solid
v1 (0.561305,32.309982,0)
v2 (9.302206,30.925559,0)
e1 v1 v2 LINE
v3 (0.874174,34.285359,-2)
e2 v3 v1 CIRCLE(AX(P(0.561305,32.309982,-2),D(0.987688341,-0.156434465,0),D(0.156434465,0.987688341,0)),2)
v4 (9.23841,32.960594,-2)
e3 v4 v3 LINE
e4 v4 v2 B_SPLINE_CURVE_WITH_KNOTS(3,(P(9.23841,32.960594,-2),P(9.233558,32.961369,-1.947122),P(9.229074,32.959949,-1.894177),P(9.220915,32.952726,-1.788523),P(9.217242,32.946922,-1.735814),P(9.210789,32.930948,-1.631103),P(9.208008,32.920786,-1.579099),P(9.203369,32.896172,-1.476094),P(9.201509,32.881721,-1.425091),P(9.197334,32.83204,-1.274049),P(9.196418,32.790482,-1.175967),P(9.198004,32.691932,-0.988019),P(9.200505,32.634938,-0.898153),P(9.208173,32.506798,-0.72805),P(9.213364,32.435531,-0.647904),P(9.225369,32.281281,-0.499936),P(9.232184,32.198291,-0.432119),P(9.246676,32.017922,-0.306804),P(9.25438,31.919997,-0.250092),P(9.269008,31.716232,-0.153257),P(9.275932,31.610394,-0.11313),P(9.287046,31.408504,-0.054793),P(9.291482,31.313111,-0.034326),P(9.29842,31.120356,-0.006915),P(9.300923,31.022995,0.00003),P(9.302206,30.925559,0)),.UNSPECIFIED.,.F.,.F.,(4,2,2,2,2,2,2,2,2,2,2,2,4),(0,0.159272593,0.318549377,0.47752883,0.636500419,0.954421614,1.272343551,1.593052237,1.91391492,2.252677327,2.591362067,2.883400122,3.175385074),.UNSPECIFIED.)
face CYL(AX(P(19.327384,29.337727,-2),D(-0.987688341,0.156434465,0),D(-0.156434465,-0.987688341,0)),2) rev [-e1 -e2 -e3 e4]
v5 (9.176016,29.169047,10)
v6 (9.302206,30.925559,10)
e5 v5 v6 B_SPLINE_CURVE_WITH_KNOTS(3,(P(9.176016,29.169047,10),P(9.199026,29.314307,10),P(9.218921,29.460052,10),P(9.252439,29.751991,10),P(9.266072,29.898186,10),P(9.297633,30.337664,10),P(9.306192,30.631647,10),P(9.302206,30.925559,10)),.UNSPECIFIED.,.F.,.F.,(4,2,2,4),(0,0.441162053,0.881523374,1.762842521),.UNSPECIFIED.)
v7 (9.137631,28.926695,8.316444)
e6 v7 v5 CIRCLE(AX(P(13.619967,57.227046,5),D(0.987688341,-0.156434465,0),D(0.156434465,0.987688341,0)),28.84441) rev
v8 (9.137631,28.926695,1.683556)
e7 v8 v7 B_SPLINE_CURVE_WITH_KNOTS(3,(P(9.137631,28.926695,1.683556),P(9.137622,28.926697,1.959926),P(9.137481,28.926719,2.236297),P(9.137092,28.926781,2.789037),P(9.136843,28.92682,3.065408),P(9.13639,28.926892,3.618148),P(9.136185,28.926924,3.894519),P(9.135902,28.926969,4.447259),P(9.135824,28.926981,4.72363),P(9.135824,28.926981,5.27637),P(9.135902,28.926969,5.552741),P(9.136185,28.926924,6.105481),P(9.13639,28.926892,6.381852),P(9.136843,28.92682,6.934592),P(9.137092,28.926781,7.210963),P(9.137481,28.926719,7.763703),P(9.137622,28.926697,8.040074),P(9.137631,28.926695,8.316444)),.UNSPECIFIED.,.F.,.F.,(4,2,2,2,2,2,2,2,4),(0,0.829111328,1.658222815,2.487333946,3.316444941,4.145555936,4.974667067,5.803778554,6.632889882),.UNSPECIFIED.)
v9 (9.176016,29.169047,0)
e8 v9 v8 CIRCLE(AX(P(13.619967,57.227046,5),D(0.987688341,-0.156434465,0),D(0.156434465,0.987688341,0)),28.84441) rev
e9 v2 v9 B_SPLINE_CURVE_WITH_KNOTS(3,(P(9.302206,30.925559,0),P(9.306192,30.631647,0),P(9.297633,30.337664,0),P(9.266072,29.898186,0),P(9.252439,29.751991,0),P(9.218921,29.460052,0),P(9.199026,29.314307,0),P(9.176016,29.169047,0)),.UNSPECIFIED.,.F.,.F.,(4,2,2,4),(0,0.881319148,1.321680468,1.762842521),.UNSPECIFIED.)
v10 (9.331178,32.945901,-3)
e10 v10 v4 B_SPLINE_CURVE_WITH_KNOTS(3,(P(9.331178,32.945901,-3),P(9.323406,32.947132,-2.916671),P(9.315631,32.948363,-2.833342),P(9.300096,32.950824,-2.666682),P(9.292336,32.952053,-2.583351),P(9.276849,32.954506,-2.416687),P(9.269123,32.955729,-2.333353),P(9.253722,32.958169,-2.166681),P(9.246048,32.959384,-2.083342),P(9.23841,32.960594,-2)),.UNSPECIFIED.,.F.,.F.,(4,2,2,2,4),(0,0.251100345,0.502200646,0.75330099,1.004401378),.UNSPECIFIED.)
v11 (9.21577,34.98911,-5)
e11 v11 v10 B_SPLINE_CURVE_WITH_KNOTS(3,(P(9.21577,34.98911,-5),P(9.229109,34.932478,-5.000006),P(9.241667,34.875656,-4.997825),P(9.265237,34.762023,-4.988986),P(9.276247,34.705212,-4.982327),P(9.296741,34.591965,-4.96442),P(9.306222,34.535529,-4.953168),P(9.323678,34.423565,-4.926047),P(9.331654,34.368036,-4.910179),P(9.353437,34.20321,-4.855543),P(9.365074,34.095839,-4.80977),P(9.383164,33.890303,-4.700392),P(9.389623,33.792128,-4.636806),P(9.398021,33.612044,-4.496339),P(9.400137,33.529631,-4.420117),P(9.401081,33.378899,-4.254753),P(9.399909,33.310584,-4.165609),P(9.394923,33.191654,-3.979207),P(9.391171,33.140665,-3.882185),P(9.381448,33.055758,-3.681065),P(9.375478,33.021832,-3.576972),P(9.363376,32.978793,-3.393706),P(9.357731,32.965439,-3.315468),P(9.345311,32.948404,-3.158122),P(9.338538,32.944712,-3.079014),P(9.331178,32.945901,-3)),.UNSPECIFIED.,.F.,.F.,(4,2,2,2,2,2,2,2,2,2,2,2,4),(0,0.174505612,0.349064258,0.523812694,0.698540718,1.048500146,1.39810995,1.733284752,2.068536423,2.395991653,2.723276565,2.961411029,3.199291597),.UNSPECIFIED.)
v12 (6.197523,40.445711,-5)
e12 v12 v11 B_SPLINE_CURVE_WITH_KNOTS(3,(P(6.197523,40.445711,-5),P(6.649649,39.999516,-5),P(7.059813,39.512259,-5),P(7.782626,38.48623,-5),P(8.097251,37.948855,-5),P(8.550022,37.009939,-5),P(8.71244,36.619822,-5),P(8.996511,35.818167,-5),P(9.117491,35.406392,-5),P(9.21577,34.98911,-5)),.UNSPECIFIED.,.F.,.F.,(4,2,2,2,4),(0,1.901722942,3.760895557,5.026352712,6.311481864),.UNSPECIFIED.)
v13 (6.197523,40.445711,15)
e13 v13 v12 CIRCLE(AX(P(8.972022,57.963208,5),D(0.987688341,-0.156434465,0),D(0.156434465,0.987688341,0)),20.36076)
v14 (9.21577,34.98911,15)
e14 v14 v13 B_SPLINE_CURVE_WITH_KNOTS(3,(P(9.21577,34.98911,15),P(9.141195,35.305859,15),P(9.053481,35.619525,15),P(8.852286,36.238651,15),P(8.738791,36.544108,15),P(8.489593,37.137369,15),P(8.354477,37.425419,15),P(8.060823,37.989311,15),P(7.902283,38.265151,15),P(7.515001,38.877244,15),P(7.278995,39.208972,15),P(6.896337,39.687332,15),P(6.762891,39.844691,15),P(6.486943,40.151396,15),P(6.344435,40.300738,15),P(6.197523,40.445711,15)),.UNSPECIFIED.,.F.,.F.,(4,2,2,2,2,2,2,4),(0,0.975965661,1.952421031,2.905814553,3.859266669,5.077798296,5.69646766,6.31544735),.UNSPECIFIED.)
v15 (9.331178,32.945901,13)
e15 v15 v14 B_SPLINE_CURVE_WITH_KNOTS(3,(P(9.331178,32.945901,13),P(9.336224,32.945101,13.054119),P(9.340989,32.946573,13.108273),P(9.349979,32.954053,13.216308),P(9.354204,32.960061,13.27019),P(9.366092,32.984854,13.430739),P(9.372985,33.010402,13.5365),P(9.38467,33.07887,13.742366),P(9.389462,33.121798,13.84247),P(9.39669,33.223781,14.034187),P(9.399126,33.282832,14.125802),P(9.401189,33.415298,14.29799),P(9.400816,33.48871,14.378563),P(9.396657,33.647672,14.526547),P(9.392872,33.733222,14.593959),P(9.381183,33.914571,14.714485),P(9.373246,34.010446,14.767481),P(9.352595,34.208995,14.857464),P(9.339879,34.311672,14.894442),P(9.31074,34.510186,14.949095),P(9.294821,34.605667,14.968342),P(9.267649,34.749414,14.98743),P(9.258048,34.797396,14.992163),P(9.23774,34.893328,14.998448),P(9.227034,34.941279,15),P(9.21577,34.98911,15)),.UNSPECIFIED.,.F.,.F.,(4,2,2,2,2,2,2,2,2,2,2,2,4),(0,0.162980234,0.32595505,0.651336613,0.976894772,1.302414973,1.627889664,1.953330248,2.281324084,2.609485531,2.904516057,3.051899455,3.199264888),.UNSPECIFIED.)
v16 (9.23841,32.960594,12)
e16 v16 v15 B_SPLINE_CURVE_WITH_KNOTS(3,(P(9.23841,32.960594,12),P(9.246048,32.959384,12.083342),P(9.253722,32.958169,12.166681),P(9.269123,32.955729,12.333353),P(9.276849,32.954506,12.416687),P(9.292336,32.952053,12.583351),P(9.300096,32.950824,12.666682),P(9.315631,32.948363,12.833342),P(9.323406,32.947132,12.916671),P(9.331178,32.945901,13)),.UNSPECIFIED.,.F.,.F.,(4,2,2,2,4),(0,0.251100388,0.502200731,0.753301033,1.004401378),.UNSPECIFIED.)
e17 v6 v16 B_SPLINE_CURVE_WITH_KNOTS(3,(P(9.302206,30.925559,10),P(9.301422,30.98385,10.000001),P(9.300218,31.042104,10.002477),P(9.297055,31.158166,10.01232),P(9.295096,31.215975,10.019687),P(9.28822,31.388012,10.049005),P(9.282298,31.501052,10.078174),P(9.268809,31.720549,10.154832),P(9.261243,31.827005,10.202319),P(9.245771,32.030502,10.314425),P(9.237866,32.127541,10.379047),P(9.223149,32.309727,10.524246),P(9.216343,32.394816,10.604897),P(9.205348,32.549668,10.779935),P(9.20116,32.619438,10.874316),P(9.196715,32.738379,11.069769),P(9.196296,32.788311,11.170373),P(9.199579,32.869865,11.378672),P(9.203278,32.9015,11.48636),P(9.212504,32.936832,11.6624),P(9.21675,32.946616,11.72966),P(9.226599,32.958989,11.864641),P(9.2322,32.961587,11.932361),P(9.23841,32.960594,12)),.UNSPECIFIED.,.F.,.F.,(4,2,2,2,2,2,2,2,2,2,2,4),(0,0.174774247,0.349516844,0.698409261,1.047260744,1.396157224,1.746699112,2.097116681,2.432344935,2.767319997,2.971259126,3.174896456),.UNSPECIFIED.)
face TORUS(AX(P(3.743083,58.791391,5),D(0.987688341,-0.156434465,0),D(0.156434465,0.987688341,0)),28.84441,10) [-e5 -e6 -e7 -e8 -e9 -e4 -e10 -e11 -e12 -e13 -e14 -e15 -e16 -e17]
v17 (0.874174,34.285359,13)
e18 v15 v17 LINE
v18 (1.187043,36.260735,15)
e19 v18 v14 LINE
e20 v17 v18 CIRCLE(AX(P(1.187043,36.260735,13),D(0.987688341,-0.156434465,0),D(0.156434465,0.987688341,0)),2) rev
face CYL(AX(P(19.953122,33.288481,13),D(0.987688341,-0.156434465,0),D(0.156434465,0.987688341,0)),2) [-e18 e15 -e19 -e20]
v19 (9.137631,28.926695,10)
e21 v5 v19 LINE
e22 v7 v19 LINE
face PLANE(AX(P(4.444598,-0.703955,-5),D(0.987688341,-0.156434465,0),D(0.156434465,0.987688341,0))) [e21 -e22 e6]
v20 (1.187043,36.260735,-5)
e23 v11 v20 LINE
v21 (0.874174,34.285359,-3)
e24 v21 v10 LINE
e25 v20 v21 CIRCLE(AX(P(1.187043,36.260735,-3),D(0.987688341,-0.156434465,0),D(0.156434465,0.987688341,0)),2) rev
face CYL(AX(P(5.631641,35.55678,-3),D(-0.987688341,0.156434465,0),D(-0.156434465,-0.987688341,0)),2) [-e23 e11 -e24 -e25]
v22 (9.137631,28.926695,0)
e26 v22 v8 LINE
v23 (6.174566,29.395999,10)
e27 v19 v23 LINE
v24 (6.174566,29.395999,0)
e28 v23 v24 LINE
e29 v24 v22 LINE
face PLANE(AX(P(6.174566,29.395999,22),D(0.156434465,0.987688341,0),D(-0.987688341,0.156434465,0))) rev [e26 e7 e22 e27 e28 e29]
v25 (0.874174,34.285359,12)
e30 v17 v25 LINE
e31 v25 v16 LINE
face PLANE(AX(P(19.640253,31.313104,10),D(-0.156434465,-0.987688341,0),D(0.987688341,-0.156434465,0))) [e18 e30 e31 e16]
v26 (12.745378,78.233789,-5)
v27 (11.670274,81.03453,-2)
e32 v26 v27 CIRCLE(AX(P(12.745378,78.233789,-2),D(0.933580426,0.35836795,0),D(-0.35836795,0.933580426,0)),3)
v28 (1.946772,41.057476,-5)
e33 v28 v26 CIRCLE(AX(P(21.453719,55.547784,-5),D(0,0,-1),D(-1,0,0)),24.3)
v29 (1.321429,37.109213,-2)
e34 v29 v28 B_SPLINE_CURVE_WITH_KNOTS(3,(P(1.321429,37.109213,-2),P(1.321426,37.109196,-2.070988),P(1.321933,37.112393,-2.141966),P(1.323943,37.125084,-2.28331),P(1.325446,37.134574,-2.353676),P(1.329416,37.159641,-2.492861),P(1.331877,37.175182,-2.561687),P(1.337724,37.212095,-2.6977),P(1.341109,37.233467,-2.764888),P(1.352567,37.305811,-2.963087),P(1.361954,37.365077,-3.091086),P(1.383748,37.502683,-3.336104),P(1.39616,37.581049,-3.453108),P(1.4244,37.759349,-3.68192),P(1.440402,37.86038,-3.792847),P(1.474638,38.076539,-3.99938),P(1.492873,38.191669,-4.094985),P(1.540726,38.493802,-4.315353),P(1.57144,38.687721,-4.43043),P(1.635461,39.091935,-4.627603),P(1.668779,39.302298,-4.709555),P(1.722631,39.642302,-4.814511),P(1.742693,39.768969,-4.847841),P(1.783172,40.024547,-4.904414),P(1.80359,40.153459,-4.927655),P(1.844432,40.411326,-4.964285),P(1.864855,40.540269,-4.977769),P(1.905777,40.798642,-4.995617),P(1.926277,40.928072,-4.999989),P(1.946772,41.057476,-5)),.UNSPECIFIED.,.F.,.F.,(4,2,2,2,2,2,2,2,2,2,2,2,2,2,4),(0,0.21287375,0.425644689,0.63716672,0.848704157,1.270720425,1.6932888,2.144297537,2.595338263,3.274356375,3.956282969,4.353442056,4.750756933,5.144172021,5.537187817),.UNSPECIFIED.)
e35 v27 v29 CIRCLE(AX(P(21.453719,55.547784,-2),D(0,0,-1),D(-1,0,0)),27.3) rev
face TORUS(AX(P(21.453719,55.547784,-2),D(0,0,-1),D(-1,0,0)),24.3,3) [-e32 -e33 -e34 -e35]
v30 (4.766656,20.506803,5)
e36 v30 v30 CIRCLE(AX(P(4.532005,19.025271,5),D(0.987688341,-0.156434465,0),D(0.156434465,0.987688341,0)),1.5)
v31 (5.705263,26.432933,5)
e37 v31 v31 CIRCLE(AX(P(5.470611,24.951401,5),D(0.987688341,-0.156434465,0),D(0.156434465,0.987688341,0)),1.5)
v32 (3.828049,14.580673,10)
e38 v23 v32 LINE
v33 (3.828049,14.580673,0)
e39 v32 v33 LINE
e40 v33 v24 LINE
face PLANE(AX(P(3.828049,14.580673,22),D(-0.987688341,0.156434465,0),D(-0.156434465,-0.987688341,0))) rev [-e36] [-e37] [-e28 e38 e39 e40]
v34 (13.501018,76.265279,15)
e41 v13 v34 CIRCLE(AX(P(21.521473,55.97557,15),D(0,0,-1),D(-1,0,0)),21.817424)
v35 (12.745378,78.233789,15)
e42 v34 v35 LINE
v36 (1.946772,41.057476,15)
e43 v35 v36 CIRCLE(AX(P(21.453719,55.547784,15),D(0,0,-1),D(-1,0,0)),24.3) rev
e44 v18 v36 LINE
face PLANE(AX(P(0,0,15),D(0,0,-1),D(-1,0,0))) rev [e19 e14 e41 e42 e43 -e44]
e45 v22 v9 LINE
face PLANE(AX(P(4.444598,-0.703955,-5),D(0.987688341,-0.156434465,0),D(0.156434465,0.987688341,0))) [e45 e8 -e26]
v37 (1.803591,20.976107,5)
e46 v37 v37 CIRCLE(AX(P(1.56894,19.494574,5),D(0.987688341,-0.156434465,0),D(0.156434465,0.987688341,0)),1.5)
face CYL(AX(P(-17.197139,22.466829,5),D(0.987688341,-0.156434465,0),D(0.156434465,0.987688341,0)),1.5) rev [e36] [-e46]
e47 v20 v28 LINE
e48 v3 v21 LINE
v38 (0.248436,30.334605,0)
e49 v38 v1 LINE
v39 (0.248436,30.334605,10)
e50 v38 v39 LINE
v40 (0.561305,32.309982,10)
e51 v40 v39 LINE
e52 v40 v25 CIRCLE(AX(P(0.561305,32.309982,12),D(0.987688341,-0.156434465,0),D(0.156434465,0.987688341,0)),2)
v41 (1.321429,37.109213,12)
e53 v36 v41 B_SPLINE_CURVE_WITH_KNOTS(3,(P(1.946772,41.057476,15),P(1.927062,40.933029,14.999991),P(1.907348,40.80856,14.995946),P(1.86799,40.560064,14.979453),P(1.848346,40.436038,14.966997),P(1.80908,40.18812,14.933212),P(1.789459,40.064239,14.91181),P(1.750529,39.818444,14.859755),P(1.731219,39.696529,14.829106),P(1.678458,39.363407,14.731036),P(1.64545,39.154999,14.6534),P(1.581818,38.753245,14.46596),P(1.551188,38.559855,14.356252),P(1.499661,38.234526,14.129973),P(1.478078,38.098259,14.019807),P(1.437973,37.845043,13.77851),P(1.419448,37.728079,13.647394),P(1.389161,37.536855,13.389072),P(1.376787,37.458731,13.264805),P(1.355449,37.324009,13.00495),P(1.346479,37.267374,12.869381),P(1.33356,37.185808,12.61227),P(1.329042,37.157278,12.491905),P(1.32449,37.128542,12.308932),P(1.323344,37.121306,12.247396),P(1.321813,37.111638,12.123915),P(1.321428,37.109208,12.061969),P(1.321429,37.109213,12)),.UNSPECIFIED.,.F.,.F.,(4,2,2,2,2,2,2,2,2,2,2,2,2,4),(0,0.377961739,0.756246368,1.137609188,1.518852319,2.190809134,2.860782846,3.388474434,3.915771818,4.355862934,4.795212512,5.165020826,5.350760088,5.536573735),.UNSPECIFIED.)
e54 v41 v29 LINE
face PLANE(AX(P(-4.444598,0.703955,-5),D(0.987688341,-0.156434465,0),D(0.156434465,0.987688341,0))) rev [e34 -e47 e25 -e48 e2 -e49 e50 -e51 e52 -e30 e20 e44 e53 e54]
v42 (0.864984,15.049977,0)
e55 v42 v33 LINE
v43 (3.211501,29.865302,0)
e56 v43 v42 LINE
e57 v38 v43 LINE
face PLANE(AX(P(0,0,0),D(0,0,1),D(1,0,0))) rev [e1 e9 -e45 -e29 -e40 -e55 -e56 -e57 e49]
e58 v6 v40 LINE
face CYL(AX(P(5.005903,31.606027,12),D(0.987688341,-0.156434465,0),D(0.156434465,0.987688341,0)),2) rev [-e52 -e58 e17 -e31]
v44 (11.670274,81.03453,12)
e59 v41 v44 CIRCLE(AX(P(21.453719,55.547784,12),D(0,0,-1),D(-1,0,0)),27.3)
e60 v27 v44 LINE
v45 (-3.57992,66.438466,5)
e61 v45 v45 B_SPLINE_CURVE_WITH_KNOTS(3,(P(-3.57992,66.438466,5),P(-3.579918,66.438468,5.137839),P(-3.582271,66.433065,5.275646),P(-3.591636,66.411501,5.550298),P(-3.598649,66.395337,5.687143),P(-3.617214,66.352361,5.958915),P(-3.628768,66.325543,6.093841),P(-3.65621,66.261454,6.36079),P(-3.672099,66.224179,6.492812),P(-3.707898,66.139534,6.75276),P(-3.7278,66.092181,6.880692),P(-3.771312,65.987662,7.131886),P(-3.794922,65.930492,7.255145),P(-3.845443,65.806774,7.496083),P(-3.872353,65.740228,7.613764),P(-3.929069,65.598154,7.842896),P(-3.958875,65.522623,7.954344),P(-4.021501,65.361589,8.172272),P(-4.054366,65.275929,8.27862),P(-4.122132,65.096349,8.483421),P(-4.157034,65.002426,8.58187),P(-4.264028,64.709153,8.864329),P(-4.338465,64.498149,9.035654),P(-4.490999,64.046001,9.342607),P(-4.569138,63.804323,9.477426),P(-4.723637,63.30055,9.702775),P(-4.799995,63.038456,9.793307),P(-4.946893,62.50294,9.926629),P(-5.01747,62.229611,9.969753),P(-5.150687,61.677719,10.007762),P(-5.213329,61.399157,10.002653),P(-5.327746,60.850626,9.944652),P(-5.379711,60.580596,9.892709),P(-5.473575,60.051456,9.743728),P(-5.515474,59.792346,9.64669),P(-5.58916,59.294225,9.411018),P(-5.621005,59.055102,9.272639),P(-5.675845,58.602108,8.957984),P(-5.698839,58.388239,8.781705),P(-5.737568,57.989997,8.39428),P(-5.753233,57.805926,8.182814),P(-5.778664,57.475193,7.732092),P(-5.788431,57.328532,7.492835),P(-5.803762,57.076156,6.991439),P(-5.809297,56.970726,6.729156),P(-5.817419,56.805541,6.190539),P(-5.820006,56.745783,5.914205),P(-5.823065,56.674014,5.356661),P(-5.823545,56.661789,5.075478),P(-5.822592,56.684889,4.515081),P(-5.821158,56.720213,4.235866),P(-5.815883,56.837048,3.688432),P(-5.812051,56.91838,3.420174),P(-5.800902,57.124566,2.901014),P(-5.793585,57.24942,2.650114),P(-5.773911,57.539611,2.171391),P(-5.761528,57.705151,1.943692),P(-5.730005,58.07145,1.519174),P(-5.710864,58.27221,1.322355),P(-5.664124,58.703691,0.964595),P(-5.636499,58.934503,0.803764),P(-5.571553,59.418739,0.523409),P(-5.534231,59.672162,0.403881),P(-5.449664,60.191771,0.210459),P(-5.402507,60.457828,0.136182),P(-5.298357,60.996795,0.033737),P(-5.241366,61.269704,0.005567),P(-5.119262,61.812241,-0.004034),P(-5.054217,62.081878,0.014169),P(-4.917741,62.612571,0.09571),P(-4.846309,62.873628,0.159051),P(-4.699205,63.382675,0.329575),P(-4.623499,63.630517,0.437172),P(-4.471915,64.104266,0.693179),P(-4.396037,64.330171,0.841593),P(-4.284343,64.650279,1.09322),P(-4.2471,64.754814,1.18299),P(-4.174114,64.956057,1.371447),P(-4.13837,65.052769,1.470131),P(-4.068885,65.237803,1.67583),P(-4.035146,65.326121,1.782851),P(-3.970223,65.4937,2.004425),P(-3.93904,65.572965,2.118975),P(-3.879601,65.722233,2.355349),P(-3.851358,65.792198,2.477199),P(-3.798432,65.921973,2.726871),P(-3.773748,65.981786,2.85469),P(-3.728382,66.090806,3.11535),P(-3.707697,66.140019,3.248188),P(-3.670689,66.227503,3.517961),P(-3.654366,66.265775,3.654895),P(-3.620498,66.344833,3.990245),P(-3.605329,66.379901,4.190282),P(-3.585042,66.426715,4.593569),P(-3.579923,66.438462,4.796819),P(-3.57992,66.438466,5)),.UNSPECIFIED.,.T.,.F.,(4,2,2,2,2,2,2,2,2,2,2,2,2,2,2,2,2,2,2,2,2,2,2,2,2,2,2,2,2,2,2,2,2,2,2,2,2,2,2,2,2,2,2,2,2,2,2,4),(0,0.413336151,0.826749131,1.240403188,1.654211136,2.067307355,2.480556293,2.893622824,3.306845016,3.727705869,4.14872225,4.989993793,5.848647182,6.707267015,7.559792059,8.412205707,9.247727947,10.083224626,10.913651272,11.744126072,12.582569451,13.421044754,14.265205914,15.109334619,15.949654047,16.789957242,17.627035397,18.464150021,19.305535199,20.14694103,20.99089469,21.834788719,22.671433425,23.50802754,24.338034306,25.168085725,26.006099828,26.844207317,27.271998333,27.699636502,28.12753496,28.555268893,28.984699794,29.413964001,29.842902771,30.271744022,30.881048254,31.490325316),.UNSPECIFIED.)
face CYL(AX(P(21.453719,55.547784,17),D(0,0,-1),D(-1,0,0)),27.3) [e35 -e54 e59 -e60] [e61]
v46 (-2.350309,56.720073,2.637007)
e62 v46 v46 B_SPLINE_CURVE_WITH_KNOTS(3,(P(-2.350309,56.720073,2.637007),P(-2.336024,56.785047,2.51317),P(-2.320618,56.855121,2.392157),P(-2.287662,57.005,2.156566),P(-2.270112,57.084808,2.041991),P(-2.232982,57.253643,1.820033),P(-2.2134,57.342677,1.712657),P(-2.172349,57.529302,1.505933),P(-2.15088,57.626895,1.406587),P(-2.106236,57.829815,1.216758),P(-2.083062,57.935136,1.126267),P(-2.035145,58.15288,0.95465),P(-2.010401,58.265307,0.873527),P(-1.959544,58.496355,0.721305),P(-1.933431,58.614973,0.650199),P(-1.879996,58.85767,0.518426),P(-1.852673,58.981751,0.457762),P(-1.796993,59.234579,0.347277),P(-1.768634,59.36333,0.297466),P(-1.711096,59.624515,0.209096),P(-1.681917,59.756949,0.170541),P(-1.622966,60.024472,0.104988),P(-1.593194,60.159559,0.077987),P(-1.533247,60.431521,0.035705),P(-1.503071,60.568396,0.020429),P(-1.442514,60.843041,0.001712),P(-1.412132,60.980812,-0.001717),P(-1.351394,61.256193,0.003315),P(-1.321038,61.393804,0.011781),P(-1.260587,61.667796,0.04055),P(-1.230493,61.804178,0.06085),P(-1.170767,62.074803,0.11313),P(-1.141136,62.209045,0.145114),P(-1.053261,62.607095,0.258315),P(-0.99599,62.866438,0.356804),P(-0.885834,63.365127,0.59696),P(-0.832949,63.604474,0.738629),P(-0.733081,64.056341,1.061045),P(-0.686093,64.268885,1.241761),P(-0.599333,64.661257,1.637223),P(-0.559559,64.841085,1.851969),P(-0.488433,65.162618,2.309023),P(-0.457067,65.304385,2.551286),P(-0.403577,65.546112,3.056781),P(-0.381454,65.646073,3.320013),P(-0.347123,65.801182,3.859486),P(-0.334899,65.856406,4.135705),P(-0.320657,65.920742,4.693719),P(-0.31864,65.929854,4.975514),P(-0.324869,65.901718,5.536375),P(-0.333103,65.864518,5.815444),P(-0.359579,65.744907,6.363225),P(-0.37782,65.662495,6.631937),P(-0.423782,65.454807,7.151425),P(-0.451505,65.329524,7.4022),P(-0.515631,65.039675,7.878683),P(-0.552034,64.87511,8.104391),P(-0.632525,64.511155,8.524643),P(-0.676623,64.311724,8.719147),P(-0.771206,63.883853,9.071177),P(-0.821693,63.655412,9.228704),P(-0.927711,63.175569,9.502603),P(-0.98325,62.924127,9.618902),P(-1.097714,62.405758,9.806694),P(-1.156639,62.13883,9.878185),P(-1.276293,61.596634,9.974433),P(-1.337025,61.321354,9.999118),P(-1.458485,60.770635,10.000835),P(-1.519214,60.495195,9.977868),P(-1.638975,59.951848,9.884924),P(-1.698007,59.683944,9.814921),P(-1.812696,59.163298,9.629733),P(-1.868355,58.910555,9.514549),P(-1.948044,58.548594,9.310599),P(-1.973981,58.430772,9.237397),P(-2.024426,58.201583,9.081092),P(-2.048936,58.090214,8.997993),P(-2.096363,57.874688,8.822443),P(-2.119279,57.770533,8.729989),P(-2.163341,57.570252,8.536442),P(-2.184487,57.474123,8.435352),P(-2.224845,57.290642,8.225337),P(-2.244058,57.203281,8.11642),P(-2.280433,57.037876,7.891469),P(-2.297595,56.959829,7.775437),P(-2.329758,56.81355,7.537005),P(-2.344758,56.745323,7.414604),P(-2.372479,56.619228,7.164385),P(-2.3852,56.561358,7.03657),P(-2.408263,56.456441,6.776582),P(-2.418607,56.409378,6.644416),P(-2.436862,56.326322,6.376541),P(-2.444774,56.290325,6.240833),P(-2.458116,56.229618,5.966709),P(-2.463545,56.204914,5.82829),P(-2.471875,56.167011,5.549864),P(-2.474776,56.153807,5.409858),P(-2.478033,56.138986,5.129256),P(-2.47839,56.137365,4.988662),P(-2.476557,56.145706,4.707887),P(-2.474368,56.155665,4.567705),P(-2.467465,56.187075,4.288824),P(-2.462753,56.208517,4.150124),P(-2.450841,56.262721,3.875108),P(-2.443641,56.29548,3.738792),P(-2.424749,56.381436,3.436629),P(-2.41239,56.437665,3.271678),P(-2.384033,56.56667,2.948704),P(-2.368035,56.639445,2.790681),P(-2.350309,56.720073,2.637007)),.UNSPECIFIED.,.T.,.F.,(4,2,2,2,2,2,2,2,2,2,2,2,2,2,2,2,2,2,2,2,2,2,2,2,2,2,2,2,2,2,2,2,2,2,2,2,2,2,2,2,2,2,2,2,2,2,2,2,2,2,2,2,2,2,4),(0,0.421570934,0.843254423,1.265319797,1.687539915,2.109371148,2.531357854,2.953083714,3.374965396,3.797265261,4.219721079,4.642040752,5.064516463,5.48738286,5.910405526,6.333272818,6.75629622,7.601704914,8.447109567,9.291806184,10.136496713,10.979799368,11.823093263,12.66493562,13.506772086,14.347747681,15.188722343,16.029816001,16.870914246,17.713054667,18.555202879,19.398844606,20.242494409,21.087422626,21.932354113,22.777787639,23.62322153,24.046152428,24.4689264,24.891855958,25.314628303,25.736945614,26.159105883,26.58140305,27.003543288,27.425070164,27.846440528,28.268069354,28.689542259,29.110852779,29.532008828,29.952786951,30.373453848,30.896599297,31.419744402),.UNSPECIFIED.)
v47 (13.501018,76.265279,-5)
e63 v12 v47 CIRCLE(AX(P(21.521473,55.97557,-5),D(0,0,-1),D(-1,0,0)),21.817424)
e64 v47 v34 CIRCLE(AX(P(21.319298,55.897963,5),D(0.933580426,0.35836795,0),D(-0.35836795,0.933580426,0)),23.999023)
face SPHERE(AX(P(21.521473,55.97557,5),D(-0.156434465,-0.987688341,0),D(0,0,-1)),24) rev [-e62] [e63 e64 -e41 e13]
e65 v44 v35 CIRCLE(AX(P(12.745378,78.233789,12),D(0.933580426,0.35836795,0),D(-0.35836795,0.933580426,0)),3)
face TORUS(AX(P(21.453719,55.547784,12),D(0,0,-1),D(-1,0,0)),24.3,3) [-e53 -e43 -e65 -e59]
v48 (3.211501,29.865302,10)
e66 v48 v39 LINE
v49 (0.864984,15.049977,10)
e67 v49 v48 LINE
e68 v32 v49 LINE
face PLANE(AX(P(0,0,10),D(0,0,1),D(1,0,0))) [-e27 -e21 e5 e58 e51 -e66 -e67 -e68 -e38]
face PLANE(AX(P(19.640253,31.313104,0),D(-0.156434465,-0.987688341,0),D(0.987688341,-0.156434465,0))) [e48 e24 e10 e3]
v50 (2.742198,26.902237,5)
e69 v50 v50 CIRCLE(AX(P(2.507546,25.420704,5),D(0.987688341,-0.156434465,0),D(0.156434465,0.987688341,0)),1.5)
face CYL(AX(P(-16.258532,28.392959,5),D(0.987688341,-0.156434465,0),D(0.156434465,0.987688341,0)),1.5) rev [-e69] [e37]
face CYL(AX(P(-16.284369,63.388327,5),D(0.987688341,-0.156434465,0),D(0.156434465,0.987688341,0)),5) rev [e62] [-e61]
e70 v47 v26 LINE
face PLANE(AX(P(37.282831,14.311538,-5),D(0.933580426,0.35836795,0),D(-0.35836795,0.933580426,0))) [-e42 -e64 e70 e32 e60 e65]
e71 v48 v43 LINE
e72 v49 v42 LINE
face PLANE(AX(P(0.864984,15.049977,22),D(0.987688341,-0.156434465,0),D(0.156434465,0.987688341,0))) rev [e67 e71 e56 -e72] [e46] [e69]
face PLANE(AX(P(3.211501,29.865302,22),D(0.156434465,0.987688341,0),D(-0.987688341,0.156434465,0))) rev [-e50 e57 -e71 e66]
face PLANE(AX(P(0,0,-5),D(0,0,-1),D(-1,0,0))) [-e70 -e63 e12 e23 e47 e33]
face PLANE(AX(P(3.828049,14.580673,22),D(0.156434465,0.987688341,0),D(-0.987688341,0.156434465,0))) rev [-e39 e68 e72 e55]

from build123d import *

# Parameters (mm, degrees)
SKETCH_1_R               = 13.75
EXTRUDE_1_DEPTH          = 10
CUT_EXTRUDE_1_DEPTH      = 22.866069606
PATTERN_CIRCULAR_1_COUNT = 20
EXTRUDE_2_DEPTH          = 5
EXTRUDE_2_DEPTH_BACK     = 15
CUT_EXTRUDE_3_DEPTH      = 10
CUT_EXTRUDE_3_DEPTH_BACK = 32
SKETCH_7_W               = 5
SKETCH_7_H               = 34
CUT_EXTRUDE_START        = -22
CUT_EXTRUDE_4_DEPTH      = 22
FILLET_2_R               = 2
FILLET_3_R               = 3
SKETCH_16_R              = 2
CUT_EXTRUDE_5_DEPTH      = 16.5
EXTRUDE_START            = 3.5
SKETCH_18_R              = 5
SKETCH_18_R_2            = 2
EXTRUDE_4_DEPTH          = 3.5
SKETCH_19_R              = 8
CUT_EXTRUDE_7_DEPTH      = 3
FILLET_4_R               = 2
CUT_EXTRUDE_8_DEPTH      = 10
CUT_EXTRUDE_9_DEPTH      = 22
SKETCH_22_R              = 1.5
CUT_EXTRUDE_10_DEPTH     = 22
SKETCH_24_R              = 5
CUT_EXTRUDE_11_DEPTH     = 26
FILLET_5_R               = 10


with BuildPart() as part:
    # 草图1 → 凸台-拉伸1 (new body)
    with BuildSketch(Plane.XY):
        Circle(SKETCH_1_R)
    extrude(amount=EXTRUDE_1_DEPTH)

    # 草图2 → 切除-拉伸1 (cut, through all)
    with BuildSketch(Plane.XY):
        with BuildLine():
            ThreePointArc((0.241645751, 10.934830295), (0, 10.9375), (-0.241645751, 10.934830295))
            add(Edge.make_bspline(
                [(-0.241645751, 10.934830295), (-0.763986756, 11.11684439), (-0.696355124, 11.483892124), (-0.766121321, 11.837511753), (-0.773615233, 11.871945767), (-0.782888612, 11.910793269), (-0.794115121, 11.953996045), (-0.807473925, 12.001489371), (-0.823140069, 12.053203535), (-0.841287339, 12.109063416), (-0.862087187, 12.168988684), (-0.885708875, 12.232893806), (-0.912319248, 12.300688126), (-0.942082628, 12.372275913), (-0.975160664, 12.447556439), (-1.011712206, 12.526424039), (-1.051893167, 12.608768189), (-1.095856396, 12.694473577), (-1.143751548, 12.783420187), (-1.195724957, 12.87548338), (-1.251919512, 12.970533976), (-1.312474533, 13.068438347), (-1.377525652, 13.169058507), (-1.447204695, 13.272252205), (-1.521639564, 13.377873025), (-1.600954126, 13.485770488), (-1.685268101, 13.595790151), (-1.774696952, 13.707773716), (-1.869351783, 13.821559139), (-1.969339231, 13.936980743), (-2.074761371, 14.053869328), (-2.185715611, 14.172052294), (-2.302294605, 14.291353753), (-2.424586158, 14.411594659), (-2.552673133, 14.532592924), (-2.686633373, 14.654163553), (-2.826539612, 14.776118764), (-2.972459398, 14.898268124), (-3.124455015, 15.020418683), (-3.282583418, 15.142375102), (-3.446896124, 15.2639398), (-3.676841988, 15.427049835), (-3.854915516, 15.545415751), (-3.976447477, 15.622814825)],
                knots=[0, 0, 0, 0, 0.165916003, 0.170905922, 0.176663519, 0.183188797, 0.190481754, 0.198542391, 0.207370708, 0.216966704, 0.22733038, 0.238461736, 0.250360771, 0.263027487, 0.276461881, 0.290663956, 0.30563371, 0.321371144, 0.337876258, 0.355149051, 0.373189524, 0.391997677, 0.411573509, 0.431917021, 0.453028213, 0.474907084, 0.497553636, 0.520967867, 0.545149777, 0.570099367, 0.595816637, 0.622301587, 0.649554216, 0.677574526, 0.706362514, 0.735918183, 0.766241531, 0.797332559, 0.829191267, 0.861817654, 0.895211721, 0.929373468, 1, 1, 1, 1], degree=3))
            ThreePointArc((-3.976447477, 15.622814825), (0, 16.120932901), (3.976447477, 15.622814825))
            add(Edge.make_bspline(
                [(0.241645751, 10.934830295), (0.763986756, 11.11684439), (0.696355124, 11.483892124), (0.766121321, 11.837511753), (0.773615233, 11.871945767), (0.782888612, 11.910793269), (0.794115121, 11.953996045), (0.807473925, 12.001489371), (0.823140069, 12.053203535), (0.841287339, 12.109063416), (0.862087187, 12.168988684), (0.885708875, 12.232893806), (0.912319248, 12.300688126), (0.942082628, 12.372275913), (0.975160664, 12.447556439), (1.011712206, 12.526424039), (1.051893167, 12.608768189), (1.095856396, 12.694473577), (1.143751548, 12.783420187), (1.195724957, 12.87548338), (1.251919512, 12.970533976), (1.312474533, 13.068438347), (1.377525652, 13.169058507), (1.447204695, 13.272252205), (1.521639564, 13.377873025), (1.600954126, 13.485770488), (1.685268101, 13.595790151), (1.774696952, 13.707773716), (1.869351783, 13.821559139), (1.969339231, 13.936980743), (2.074761371, 14.053869328), (2.185715611, 14.172052294), (2.302294605, 14.291353753), (2.424586158, 14.411594659), (2.552673133, 14.532592924), (2.686633373, 14.654163553), (2.826539612, 14.776118764), (2.972459398, 14.898268124), (3.124455015, 15.020418683), (3.282583418, 15.142375102), (3.446896124, 15.2639398), (3.676841988, 15.427049835), (3.854915516, 15.545415751), (3.976447477, 15.622814825)],
                knots=[0, 0, 0, 0, 0.165916003, 0.170905922, 0.176663519, 0.183188797, 0.190481754, 0.198542391, 0.207370708, 0.216966704, 0.22733038, 0.238461736, 0.250360771, 0.263027487, 0.276461881, 0.290663956, 0.30563371, 0.321371144, 0.337876258, 0.355149051, 0.373189524, 0.391997677, 0.411573509, 0.431917021, 0.453028213, 0.474907084, 0.497553636, 0.520967867, 0.545149777, 0.570099367, 0.595816637, 0.622301587, 0.649554216, 0.677574526, 0.706362514, 0.735918183, 0.766241531, 0.797332559, 0.829191267, 0.861817654, 0.895211721, 0.929373468, 1, 1, 1, 1], degree=3))
        make_face()
    cut_extrude_1 = extrude(amount=CUT_EXTRUDE_1_DEPTH, mode=Mode.SUBTRACT)

    # 阵列(圆周)1: 切除-拉伸1 ×20 about axis
    pattern_circular_1_axis = Axis((0, 0, -1.5), (0, 0, 1))
    for i in range(1, PATTERN_CIRCULAR_1_COUNT):
        add(cut_extrude_1.rotate(pattern_circular_1_axis, i * 360 / PATTERN_CIRCULAR_1_COUNT), mode=Mode.SUBTRACT)

    # 草图6 → 凸台-拉伸2 (add, two sides: drawn at the far end of the back side and taken through both)
    with BuildSketch(Plane(origin=(0, 0, 0), x_dir=(-1, 0, 0), z_dir=(0, 0, -1)).offset(-EXTRUDE_2_DEPTH_BACK)):
        with BuildLine():
            Line((-4.444597533, -0.703955093), (4.444597533, 0.703955093))
            Line((4.444597533, 0.703955093), (-1.123309149, 35.858334335))
            ThreePointArc((-1.123309149, 35.858334335), (6.18175463, 61.653569146), (-11.311209389, 81.969924763))
            Line((-11.311209389, 81.969924763), (-15.719831619, 70.4850712))
            Line((-15.719831619, 70.4850712), (-10.012504214, 34.45042415))
            Line((-10.012504214, 34.45042415), (-4.444597533, -0.703955093))
        make_face()
    extrude(amount=EXTRUDE_2_DEPTH + EXTRUDE_2_DEPTH_BACK)

    # 草图7 → 切除-拉伸3 (cut, two sides: drawn at the far end of the back side and taken through both)
    with BuildSketch(Plane(origin=(4.444597533, -0.703955093, 0), x_dir=(0, 0, -1), z_dir=(0.9876883405951378, -0.15643446504023126, 0)).offset(-CUT_EXTRUDE_3_DEPTH_BACK)):
        with Locations((2.5, 17)):
            Rectangle(SKETCH_7_W, SKETCH_7_H)
        with Locations((-12.5, 17)):
            Rectangle(SKETCH_7_W, SKETCH_7_H)
    extrude(amount=CUT_EXTRUDE_3_DEPTH + CUT_EXTRUDE_3_DEPTH_BACK, mode=Mode.SUBTRACT)

    # 草图13 → 切除-旋转2 (revolve, cut)
    with BuildSketch(Plane(origin=(12.346104257, -1.955430813, 0), x_dir=(0, 0, 1), z_dir=(-0.9876883405951388, 0.1564344650402244, 0))):
        with BuildLine():
            Line((5, 82.653118449), (5, 34.653118449))
            ThreePointArc((5, 34.653118449), (29, 58.653118449), (5, 82.653118449))
        make_face()
    revolve(axis=Axis((12.41385891, -1.527644771, 5), (0.1564344650402244, 0.9876883405951388, 0)), mode=Mode.SUBTRACT)

    # 草图12 → 切除-拉伸4 (cut)
    with BuildSketch(Plane(origin=(0, 0, -5), x_dir=(-1, 0, 0), z_dir=(0, 0, -1)).offset(CUT_EXTRUDE_START)):
        with BuildLine():
            Line((-11.311209389, 81.969924763), (-11.670273789, 81.03453002))
            ThreePointArc((-11.670273789, 81.03453002), (1.044926137, 71.010674644), (5.846281188, 55.547784376))
            ThreePointArc((5.846281188, 55.547784376), (3.991334875, 45.656412233), (-1.321428913, 37.109213298))
            Line((-1.321428913, 37.109213298), (-1.123309149, 35.858334335))
            ThreePointArc((-1.123309149, 35.858334335), (4.779753161, 44.926816989), (6.848224584, 55.547784376))
            ThreePointArc((6.848224584, 55.547784376), (1.87065393, 71.578181633), (-11.311209389, 81.969924763))
        make_face()
    extrude(amount=CUT_EXTRUDE_4_DEPTH, mode=Mode.SUBTRACT)

    # 圆角2
    fillet_2_edges = [part.edges().sort_by_distance(p)[0] for p in [
        (5.318771811, 33.58140358, 15),
        (5.318771811, 33.58140358, -5),
        (5.318771811, 33.58140358, 0),
        (5.318771811, 33.58140358, 10),
    ]]
    fillet(fillet_2_edges, radius=FILLET_2_R)

    # 圆角3
    fillet_3_edges = [part.edges().sort_by_distance(p)[0] for p in [
        (-5.118751176, 61.808282659, -5),
        (-5.118751176, 61.808282659, 15),
    ]]
    fillet(fillet_3_edges, radius=FILLET_3_R)

    # 草图16 → 切除-拉伸5 (cut)
    with BuildSketch(Plane.XY.offset(10)):
        Circle(SKETCH_16_R)
    extrude(amount=-CUT_EXTRUDE_5_DEPTH, mode=Mode.SUBTRACT)

    # 草图18 → 凸台-拉伸4 (add)
    with BuildSketch(Plane.XY.offset(10).offset(EXTRUDE_START)):
        Circle(SKETCH_18_R)
        Circle(SKETCH_18_R_2, mode=Mode.SUBTRACT)
    extrude(amount=-EXTRUDE_4_DEPTH)

    # 草图19 → 切除-拉伸7 (cut)
    with BuildSketch(Plane(origin=(0, 0, 0), x_dir=(-1, 0, 0), z_dir=(0, 0, -1))):
        Circle(SKETCH_19_R)
    extrude(amount=-CUT_EXTRUDE_7_DEPTH, mode=Mode.SUBTRACT)

    # 圆角4
    fillet_4_edges = [part.edges().sort_by_distance(p)[0] for p in [
        (-5, 0, 10),
    ]]
    fillet(fillet_4_edges, radius=FILLET_4_R)

    # 草图20 → 切除-拉伸8 (cut)
    with BuildSketch(Plane(origin=(0, 0, 0), x_dir=(-1, 0, 0), z_dir=(0, 0, -1))):
        with BuildLine():
            Line((5.774187452, 16.519950341), (3.608867158, 10.324968963))
            ThreePointArc((3.608867158, 10.324968963), (8.919105639, 6.330755157), (10.9375, 0))
            ThreePointArc((10.9375, 0), (10.936832553, -0.120830249), (10.934830295, -0.241645751))
            Line((10.934830295, -0.241645751), (17.498331559, -0.241645751))
            ThreePointArc((17.498331559, -0.241645751), (17.499582885, -0.120825755), (17.5, 0))
            ThreePointArc((17.5, 0), (14.270569022, 10.129208251), (5.774187452, 16.519950341))
        make_face()
    extrude(amount=-CUT_EXTRUDE_8_DEPTH, mode=Mode.SUBTRACT)

    # 草图21 → 切除-拉伸9 (cut)
    with BuildSketch(Plane(origin=(0, 0, 0), x_dir=(-1, 0, 0), z_dir=(0, 0, -1))):
        Polygon((-3.828049486, 14.580673411), (-0.864984465, 15.049976806), (-3.21150144, 29.865301915), (16.542265372, 32.993991216), (24.363988624, -16.390425814), (3.089937746, -19.759904455), (-18.106610022, -23.11710781), (-25.928333274, 26.267309219), (-6.174566462, 29.39599852), align=None)
    extrude(amount=-CUT_EXTRUDE_9_DEPTH, mode=Mode.SUBTRACT)

    # 草图22 → 切除-拉伸10 (cut)
    with BuildSketch(Plane(origin=(1.481532511, -0.234651698, 0), x_dir=(0, 0, -1), z_dir=(0.9876883405951379, -0.15643446504023095, 0))):
        with Locations(Location((-5, 25.5, 0), (0, 0, 90))):
            Circle(SKETCH_22_R)
        with Locations(Location((-5, 19.5, 0), (0, 0, 90))):
            Circle(SKETCH_22_R)
    extrude(amount=-CUT_EXTRUDE_10_DEPTH, mode=Mode.SUBTRACT)

    # 草图24 → 切除-拉伸11 (cut)
    with BuildSketch(Plane(origin=(0, 0, 0), x_dir=(0, 0, 1), z_dir=(-0.9876883405951388, 0.1564344650402244, 0))):
        with Locations(Location((5, 60.060474958, 0), (0, 0, 90))):
            Circle(SKETCH_24_R)
    extrude(amount=CUT_EXTRUDE_11_DEPTH, mode=Mode.SUBTRACT)

    # 圆角5
    # the kernel refuses this fillet: 10 mm, written as the material it takes off along each edge
    with BuildSketch(Plane(origin=(13.61996674, 57.227046138, 5), x_dir=(-0.06465125849803334, -0.4081919812676051, -0.910603932126063), z_dir=(0.1424498389856716, 0.8993928866609987, -0.41328014565975996))) as fillet_5_piece_1:
        with BuildLine():
            CenterArc((28.844410204, 10), FILLET_5_R, 211.965718751, 58.034281249)
            ThreePointArc((20.360760144, 4.705882353), (21.622492356, 2.414788732), (22.627416998, 0))
            Line((22.627416998, 0), (28.844410204, 0))
        make_face()
    revolve(axis=Axis((13.61996674, 57.227046138, 5), (-0.9876883405951378, 0.15643446504023112, 0)), revolution_arc=131.177888663, mode=Mode.SUBTRACT)


solid = part.part
